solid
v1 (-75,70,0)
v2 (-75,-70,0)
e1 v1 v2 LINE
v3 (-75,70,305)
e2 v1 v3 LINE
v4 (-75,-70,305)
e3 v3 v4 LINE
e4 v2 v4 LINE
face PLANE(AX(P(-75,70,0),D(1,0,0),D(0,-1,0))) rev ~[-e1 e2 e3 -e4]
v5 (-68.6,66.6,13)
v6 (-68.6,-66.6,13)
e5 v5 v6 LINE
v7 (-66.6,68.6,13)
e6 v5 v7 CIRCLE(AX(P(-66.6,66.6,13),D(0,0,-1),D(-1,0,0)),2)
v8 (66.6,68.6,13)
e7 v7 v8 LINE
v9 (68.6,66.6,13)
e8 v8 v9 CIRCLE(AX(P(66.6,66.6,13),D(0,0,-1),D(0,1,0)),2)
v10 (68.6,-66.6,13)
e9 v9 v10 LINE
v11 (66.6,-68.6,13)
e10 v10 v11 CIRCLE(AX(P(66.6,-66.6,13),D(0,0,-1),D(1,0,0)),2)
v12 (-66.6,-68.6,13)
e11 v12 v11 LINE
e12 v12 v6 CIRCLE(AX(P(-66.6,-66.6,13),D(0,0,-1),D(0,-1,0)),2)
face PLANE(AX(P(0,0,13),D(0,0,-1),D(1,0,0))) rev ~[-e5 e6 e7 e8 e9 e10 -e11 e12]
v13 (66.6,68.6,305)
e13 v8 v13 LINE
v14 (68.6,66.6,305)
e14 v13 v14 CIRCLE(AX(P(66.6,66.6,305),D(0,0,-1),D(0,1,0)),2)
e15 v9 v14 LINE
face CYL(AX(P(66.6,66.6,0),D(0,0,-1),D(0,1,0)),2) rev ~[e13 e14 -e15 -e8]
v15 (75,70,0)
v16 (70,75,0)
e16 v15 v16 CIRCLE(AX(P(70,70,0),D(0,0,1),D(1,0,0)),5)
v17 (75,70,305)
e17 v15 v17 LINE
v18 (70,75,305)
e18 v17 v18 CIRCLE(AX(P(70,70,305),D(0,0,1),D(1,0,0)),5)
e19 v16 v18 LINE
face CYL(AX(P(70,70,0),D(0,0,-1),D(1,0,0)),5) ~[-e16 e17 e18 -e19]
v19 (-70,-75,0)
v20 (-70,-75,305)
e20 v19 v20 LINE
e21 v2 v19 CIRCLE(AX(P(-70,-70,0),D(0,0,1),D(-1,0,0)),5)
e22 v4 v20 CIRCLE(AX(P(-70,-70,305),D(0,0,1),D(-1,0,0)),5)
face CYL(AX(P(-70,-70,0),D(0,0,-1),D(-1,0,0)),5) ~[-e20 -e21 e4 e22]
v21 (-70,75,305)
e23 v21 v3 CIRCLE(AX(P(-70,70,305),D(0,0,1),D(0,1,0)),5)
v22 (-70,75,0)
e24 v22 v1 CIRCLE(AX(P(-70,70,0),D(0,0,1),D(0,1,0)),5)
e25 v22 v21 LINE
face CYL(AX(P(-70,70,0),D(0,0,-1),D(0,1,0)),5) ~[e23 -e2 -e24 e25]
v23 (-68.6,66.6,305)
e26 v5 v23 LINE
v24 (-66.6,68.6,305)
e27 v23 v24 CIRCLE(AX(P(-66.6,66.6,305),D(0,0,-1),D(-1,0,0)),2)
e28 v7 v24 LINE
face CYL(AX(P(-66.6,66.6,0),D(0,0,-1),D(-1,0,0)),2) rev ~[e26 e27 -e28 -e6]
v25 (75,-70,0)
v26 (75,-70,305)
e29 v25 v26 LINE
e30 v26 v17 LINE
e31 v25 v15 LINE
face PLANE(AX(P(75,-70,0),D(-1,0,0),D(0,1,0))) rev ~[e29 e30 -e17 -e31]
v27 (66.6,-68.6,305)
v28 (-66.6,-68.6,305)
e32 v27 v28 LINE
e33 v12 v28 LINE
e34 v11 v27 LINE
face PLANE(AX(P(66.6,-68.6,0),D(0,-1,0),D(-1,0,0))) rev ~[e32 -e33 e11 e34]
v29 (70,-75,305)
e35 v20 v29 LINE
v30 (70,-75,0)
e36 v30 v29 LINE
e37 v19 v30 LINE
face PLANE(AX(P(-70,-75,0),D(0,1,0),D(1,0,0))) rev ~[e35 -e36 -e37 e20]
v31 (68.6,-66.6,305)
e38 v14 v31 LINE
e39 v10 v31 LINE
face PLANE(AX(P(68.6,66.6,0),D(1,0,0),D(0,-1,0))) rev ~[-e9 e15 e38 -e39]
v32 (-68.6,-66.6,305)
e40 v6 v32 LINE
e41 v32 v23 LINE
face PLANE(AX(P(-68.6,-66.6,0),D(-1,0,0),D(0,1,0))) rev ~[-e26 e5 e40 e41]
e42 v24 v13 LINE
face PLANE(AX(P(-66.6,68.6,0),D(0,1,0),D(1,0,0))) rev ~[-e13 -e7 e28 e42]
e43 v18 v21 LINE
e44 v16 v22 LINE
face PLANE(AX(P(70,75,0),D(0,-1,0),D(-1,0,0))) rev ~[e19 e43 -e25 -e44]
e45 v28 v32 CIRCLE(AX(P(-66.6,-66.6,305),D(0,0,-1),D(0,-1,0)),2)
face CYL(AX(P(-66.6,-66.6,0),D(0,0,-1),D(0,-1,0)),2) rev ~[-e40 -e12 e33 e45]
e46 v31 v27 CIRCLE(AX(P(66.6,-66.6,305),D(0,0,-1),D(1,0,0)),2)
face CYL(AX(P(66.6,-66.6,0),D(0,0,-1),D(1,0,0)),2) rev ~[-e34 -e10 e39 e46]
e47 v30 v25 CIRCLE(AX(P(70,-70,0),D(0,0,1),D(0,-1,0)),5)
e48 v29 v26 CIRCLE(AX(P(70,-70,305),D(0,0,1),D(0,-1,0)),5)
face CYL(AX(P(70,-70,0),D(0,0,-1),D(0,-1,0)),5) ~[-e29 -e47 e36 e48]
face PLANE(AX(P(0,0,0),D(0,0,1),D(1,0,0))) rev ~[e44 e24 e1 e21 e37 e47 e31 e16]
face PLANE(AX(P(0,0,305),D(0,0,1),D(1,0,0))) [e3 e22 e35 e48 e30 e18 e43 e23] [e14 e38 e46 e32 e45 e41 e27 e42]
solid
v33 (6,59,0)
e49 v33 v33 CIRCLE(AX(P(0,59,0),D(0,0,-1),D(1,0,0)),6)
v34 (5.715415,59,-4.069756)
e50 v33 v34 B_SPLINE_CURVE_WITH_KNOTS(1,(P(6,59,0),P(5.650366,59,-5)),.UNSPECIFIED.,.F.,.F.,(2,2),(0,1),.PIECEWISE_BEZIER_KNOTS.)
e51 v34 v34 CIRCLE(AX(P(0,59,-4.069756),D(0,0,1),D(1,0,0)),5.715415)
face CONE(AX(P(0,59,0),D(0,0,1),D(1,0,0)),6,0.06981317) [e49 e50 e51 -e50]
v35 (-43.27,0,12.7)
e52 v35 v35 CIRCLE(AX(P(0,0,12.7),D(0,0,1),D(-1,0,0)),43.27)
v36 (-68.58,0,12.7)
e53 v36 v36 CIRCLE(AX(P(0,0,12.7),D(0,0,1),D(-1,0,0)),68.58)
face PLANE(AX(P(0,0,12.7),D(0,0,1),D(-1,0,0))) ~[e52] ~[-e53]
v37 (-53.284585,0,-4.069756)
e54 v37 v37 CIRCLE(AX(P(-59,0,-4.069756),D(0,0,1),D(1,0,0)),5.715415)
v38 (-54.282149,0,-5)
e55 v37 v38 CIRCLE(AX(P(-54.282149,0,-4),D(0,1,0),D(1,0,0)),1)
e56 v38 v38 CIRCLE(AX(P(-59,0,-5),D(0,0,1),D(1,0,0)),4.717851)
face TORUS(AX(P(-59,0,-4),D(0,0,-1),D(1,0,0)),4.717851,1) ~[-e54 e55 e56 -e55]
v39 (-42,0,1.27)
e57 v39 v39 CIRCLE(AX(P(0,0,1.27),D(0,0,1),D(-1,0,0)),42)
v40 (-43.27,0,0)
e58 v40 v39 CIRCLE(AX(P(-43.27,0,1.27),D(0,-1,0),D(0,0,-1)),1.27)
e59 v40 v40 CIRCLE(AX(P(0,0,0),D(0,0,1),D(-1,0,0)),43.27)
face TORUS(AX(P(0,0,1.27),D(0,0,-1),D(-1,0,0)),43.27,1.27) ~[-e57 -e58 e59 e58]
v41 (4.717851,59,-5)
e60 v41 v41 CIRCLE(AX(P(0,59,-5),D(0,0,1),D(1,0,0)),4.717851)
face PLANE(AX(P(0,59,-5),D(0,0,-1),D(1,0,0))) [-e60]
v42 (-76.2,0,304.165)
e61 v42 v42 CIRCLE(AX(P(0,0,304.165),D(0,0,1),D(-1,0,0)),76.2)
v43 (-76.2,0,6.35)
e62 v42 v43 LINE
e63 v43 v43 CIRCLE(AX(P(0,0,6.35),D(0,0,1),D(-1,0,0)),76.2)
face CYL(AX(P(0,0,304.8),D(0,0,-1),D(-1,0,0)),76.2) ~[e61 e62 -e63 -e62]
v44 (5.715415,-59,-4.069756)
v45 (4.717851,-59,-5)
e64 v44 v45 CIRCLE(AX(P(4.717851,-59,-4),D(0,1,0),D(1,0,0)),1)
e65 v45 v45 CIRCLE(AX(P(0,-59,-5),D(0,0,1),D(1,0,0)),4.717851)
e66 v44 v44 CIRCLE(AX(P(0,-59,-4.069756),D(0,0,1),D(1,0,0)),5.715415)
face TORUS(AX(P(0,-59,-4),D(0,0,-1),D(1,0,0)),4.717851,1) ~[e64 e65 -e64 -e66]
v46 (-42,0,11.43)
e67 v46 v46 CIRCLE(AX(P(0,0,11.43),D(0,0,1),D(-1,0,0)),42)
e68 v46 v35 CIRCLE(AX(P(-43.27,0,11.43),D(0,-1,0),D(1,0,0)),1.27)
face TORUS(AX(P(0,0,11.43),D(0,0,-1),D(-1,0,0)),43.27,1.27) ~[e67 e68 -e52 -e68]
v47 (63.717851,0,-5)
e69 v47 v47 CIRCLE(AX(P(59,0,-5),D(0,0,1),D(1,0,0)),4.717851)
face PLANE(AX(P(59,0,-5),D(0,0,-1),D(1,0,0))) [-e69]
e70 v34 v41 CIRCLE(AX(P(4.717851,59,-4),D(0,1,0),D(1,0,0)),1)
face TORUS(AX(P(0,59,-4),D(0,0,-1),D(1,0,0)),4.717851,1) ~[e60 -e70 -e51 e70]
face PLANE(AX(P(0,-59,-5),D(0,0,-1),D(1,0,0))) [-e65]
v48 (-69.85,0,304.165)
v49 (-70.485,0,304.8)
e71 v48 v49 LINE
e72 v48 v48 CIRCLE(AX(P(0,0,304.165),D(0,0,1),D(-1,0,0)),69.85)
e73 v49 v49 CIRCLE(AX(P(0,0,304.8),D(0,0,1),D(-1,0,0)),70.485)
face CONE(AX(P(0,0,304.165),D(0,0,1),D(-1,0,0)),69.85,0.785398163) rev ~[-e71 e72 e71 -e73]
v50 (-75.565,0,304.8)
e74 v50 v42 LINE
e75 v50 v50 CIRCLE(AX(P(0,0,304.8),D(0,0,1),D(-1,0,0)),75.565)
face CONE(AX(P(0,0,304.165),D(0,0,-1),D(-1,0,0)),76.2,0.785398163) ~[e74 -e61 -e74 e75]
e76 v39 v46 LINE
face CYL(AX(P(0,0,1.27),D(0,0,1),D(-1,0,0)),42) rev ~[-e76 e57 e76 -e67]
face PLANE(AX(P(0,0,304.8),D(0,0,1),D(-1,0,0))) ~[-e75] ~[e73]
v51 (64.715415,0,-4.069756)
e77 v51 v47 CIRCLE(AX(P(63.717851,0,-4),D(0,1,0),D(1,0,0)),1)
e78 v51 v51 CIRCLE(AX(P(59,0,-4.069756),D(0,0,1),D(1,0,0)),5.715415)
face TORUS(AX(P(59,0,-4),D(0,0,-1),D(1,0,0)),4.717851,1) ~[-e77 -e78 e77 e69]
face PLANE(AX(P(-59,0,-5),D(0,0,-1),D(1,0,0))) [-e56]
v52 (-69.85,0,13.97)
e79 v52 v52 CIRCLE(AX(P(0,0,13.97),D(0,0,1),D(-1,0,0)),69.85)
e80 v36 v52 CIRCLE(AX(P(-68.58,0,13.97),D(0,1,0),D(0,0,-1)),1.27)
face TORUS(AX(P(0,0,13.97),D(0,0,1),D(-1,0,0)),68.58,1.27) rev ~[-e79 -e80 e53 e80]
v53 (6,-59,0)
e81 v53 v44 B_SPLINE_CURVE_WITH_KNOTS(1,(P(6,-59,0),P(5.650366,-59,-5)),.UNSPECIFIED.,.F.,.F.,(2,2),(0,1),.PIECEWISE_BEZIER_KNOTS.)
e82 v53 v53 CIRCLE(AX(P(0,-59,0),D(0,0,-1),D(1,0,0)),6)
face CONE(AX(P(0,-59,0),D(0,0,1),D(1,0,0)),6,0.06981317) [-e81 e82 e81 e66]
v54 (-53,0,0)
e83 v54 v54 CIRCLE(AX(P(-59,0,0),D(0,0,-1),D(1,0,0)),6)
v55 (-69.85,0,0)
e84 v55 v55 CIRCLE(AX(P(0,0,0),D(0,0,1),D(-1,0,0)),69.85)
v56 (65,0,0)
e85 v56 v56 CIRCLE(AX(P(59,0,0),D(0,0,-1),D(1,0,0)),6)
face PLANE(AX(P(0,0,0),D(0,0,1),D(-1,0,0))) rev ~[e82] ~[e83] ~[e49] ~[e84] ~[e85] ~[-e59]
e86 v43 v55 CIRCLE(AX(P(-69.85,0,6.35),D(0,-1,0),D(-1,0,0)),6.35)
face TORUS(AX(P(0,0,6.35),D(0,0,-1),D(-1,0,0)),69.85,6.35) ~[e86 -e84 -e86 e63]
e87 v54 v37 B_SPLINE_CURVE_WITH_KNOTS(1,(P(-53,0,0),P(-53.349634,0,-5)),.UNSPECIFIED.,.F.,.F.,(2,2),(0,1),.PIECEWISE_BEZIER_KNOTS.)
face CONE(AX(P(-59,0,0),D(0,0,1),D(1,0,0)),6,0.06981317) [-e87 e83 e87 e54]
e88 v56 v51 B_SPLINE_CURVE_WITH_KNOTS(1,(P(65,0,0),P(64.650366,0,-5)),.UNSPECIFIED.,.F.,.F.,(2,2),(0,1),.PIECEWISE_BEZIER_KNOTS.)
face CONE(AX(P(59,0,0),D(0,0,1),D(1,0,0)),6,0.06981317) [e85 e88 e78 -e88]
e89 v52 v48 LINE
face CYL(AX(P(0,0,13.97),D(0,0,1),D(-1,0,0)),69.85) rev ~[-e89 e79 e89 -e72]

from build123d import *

# Parameters (mm, degrees)
F3_SIZE   = 0.635
F4_R      = 6
F5_DEPTH  = 5
F5_TAPER  = 4
F6_R      = 1
F8_DEPTH  = 305
F9_W      = 137.2
F9_H      = 137.2
F10_DEPTH = 13


with BuildPart() as f2:
    # F0 (on Front) → F2 (revolve)
    with BuildSketch(Plane.XZ):
        with BuildLine():
            Line((-69.85, 0), (-43.27, 0))
            ThreePointArc((-43.27, 0), (-42.3719743879, 0.3719743879), (-42, 1.27))
            Line((-42, 1.27), (-42, 11.43))
            ThreePointArc((-42, 11.43), (-42.3719743879, 12.3280256121), (-43.27, 12.7))
            Line((-43.27, 12.7), (-68.58, 12.7))
            ThreePointArc((-68.58, 12.7), (-69.4780256121, 13.0719743879), (-69.85, 13.97))
            Line((-69.85, 13.97), (-69.85, 304.8))
            Line((-69.85, 304.8), (-76.2, 304.8))
            Line((-76.2, 304.8), (-76.2, 6.35))
            ThreePointArc((-76.2, 6.35), (-74.3401280605, 1.8598719395), (-69.85, 0))
        make_face()
    revolve(axis=Axis((0, 0, 44.2740730941), (0, 0, 1)))

    # F3
    f3_edges = [f2.edges().sort_by_distance(p)[0] for p in [
        (69.85, 0, 304.8),
        (76.2, 0, 304.8),
    ]]
    chamfer(f3_edges, length=F3_SIZE)

    # F4 (on face) → F5 (join)
    with BuildSketch(Plane(origin=(0, 0, 0), x_dir=(1, 0, 0), z_dir=(0, 0, -1))):
        with Locations((0, 59)):
            Circle(F4_R)
        with Locations((-59, 0)):
            Circle(F4_R)
        with Locations((0, -59)):
            Circle(F4_R)
        with Locations((59, 0)):
            Circle(F4_R)
    extrude(amount=F5_DEPTH, taper=F5_TAPER)

    # F6
    f6_edges = [f2.edges().sort_by_distance(p)[0] for p in [
        (-5.650366, -59, -5),
        (-64.650366, 0, -5),
        (-5.650366, 59, -5),
        (53.349634, 0, -5),
    ]]
    fillet(f6_edges, radius=F6_R)


with BuildPart() as f8:
    # F7 (on Top) → F8 (new body)
    with BuildSketch(Plane.XY):
        with BuildLine():
            Line((-70, -75), (70, -75))
            ThreePointArc((70, -75), (73.5355339059, -73.5355339059), (75, -70))
            Line((75, -70), (75, 70))
            ThreePointArc((75, 70), (73.5355339059, 73.5355339059), (70, 75))
            Line((70, 75), (-70, 75))
            ThreePointArc((-70, 75), (-73.5355339059, 73.5355339059), (-75, 70))
            Line((-75, 70), (-75, -70))
            ThreePointArc((-75, -70), (-73.5355339059, -73.5355339059), (-70, -75))
        make_face()
        with BuildLine():
            Line((68.6, 66.6), (68.6, -66.6))
            ThreePointArc((68.6, -66.6), (68.0142135624, -68.0142135624), (66.6, -68.6))
            Line((66.6, -68.6), (-66.6, -68.6))
            ThreePointArc((-66.6, -68.6), (-68.0142135624, -68.0142135624), (-68.6, -66.6))
            Line((-68.6, -66.6), (-68.6, 66.6))
            ThreePointArc((-68.6, 66.6), (-68.0142135624, 68.0142135624), (-66.6, 68.6))
            Line((-66.6, 68.6), (66.6, 68.6))
            ThreePointArc((66.6, 68.6), (68.0142135624, 68.0142135624), (68.6, 66.6))
        make_face(mode=Mode.SUBTRACT)
    extrude(amount=F8_DEPTH)

    # F9 (on face) → F10 (join)
    with BuildSketch(Plane(origin=(0, 0, 0), x_dir=(1, 0, 0), z_dir=(0, 0, -1))):
        Rectangle(F9_W, F9_H)
    extrude(amount=-F10_DEPTH)


solid = Compound([f2.part, f8.part])
